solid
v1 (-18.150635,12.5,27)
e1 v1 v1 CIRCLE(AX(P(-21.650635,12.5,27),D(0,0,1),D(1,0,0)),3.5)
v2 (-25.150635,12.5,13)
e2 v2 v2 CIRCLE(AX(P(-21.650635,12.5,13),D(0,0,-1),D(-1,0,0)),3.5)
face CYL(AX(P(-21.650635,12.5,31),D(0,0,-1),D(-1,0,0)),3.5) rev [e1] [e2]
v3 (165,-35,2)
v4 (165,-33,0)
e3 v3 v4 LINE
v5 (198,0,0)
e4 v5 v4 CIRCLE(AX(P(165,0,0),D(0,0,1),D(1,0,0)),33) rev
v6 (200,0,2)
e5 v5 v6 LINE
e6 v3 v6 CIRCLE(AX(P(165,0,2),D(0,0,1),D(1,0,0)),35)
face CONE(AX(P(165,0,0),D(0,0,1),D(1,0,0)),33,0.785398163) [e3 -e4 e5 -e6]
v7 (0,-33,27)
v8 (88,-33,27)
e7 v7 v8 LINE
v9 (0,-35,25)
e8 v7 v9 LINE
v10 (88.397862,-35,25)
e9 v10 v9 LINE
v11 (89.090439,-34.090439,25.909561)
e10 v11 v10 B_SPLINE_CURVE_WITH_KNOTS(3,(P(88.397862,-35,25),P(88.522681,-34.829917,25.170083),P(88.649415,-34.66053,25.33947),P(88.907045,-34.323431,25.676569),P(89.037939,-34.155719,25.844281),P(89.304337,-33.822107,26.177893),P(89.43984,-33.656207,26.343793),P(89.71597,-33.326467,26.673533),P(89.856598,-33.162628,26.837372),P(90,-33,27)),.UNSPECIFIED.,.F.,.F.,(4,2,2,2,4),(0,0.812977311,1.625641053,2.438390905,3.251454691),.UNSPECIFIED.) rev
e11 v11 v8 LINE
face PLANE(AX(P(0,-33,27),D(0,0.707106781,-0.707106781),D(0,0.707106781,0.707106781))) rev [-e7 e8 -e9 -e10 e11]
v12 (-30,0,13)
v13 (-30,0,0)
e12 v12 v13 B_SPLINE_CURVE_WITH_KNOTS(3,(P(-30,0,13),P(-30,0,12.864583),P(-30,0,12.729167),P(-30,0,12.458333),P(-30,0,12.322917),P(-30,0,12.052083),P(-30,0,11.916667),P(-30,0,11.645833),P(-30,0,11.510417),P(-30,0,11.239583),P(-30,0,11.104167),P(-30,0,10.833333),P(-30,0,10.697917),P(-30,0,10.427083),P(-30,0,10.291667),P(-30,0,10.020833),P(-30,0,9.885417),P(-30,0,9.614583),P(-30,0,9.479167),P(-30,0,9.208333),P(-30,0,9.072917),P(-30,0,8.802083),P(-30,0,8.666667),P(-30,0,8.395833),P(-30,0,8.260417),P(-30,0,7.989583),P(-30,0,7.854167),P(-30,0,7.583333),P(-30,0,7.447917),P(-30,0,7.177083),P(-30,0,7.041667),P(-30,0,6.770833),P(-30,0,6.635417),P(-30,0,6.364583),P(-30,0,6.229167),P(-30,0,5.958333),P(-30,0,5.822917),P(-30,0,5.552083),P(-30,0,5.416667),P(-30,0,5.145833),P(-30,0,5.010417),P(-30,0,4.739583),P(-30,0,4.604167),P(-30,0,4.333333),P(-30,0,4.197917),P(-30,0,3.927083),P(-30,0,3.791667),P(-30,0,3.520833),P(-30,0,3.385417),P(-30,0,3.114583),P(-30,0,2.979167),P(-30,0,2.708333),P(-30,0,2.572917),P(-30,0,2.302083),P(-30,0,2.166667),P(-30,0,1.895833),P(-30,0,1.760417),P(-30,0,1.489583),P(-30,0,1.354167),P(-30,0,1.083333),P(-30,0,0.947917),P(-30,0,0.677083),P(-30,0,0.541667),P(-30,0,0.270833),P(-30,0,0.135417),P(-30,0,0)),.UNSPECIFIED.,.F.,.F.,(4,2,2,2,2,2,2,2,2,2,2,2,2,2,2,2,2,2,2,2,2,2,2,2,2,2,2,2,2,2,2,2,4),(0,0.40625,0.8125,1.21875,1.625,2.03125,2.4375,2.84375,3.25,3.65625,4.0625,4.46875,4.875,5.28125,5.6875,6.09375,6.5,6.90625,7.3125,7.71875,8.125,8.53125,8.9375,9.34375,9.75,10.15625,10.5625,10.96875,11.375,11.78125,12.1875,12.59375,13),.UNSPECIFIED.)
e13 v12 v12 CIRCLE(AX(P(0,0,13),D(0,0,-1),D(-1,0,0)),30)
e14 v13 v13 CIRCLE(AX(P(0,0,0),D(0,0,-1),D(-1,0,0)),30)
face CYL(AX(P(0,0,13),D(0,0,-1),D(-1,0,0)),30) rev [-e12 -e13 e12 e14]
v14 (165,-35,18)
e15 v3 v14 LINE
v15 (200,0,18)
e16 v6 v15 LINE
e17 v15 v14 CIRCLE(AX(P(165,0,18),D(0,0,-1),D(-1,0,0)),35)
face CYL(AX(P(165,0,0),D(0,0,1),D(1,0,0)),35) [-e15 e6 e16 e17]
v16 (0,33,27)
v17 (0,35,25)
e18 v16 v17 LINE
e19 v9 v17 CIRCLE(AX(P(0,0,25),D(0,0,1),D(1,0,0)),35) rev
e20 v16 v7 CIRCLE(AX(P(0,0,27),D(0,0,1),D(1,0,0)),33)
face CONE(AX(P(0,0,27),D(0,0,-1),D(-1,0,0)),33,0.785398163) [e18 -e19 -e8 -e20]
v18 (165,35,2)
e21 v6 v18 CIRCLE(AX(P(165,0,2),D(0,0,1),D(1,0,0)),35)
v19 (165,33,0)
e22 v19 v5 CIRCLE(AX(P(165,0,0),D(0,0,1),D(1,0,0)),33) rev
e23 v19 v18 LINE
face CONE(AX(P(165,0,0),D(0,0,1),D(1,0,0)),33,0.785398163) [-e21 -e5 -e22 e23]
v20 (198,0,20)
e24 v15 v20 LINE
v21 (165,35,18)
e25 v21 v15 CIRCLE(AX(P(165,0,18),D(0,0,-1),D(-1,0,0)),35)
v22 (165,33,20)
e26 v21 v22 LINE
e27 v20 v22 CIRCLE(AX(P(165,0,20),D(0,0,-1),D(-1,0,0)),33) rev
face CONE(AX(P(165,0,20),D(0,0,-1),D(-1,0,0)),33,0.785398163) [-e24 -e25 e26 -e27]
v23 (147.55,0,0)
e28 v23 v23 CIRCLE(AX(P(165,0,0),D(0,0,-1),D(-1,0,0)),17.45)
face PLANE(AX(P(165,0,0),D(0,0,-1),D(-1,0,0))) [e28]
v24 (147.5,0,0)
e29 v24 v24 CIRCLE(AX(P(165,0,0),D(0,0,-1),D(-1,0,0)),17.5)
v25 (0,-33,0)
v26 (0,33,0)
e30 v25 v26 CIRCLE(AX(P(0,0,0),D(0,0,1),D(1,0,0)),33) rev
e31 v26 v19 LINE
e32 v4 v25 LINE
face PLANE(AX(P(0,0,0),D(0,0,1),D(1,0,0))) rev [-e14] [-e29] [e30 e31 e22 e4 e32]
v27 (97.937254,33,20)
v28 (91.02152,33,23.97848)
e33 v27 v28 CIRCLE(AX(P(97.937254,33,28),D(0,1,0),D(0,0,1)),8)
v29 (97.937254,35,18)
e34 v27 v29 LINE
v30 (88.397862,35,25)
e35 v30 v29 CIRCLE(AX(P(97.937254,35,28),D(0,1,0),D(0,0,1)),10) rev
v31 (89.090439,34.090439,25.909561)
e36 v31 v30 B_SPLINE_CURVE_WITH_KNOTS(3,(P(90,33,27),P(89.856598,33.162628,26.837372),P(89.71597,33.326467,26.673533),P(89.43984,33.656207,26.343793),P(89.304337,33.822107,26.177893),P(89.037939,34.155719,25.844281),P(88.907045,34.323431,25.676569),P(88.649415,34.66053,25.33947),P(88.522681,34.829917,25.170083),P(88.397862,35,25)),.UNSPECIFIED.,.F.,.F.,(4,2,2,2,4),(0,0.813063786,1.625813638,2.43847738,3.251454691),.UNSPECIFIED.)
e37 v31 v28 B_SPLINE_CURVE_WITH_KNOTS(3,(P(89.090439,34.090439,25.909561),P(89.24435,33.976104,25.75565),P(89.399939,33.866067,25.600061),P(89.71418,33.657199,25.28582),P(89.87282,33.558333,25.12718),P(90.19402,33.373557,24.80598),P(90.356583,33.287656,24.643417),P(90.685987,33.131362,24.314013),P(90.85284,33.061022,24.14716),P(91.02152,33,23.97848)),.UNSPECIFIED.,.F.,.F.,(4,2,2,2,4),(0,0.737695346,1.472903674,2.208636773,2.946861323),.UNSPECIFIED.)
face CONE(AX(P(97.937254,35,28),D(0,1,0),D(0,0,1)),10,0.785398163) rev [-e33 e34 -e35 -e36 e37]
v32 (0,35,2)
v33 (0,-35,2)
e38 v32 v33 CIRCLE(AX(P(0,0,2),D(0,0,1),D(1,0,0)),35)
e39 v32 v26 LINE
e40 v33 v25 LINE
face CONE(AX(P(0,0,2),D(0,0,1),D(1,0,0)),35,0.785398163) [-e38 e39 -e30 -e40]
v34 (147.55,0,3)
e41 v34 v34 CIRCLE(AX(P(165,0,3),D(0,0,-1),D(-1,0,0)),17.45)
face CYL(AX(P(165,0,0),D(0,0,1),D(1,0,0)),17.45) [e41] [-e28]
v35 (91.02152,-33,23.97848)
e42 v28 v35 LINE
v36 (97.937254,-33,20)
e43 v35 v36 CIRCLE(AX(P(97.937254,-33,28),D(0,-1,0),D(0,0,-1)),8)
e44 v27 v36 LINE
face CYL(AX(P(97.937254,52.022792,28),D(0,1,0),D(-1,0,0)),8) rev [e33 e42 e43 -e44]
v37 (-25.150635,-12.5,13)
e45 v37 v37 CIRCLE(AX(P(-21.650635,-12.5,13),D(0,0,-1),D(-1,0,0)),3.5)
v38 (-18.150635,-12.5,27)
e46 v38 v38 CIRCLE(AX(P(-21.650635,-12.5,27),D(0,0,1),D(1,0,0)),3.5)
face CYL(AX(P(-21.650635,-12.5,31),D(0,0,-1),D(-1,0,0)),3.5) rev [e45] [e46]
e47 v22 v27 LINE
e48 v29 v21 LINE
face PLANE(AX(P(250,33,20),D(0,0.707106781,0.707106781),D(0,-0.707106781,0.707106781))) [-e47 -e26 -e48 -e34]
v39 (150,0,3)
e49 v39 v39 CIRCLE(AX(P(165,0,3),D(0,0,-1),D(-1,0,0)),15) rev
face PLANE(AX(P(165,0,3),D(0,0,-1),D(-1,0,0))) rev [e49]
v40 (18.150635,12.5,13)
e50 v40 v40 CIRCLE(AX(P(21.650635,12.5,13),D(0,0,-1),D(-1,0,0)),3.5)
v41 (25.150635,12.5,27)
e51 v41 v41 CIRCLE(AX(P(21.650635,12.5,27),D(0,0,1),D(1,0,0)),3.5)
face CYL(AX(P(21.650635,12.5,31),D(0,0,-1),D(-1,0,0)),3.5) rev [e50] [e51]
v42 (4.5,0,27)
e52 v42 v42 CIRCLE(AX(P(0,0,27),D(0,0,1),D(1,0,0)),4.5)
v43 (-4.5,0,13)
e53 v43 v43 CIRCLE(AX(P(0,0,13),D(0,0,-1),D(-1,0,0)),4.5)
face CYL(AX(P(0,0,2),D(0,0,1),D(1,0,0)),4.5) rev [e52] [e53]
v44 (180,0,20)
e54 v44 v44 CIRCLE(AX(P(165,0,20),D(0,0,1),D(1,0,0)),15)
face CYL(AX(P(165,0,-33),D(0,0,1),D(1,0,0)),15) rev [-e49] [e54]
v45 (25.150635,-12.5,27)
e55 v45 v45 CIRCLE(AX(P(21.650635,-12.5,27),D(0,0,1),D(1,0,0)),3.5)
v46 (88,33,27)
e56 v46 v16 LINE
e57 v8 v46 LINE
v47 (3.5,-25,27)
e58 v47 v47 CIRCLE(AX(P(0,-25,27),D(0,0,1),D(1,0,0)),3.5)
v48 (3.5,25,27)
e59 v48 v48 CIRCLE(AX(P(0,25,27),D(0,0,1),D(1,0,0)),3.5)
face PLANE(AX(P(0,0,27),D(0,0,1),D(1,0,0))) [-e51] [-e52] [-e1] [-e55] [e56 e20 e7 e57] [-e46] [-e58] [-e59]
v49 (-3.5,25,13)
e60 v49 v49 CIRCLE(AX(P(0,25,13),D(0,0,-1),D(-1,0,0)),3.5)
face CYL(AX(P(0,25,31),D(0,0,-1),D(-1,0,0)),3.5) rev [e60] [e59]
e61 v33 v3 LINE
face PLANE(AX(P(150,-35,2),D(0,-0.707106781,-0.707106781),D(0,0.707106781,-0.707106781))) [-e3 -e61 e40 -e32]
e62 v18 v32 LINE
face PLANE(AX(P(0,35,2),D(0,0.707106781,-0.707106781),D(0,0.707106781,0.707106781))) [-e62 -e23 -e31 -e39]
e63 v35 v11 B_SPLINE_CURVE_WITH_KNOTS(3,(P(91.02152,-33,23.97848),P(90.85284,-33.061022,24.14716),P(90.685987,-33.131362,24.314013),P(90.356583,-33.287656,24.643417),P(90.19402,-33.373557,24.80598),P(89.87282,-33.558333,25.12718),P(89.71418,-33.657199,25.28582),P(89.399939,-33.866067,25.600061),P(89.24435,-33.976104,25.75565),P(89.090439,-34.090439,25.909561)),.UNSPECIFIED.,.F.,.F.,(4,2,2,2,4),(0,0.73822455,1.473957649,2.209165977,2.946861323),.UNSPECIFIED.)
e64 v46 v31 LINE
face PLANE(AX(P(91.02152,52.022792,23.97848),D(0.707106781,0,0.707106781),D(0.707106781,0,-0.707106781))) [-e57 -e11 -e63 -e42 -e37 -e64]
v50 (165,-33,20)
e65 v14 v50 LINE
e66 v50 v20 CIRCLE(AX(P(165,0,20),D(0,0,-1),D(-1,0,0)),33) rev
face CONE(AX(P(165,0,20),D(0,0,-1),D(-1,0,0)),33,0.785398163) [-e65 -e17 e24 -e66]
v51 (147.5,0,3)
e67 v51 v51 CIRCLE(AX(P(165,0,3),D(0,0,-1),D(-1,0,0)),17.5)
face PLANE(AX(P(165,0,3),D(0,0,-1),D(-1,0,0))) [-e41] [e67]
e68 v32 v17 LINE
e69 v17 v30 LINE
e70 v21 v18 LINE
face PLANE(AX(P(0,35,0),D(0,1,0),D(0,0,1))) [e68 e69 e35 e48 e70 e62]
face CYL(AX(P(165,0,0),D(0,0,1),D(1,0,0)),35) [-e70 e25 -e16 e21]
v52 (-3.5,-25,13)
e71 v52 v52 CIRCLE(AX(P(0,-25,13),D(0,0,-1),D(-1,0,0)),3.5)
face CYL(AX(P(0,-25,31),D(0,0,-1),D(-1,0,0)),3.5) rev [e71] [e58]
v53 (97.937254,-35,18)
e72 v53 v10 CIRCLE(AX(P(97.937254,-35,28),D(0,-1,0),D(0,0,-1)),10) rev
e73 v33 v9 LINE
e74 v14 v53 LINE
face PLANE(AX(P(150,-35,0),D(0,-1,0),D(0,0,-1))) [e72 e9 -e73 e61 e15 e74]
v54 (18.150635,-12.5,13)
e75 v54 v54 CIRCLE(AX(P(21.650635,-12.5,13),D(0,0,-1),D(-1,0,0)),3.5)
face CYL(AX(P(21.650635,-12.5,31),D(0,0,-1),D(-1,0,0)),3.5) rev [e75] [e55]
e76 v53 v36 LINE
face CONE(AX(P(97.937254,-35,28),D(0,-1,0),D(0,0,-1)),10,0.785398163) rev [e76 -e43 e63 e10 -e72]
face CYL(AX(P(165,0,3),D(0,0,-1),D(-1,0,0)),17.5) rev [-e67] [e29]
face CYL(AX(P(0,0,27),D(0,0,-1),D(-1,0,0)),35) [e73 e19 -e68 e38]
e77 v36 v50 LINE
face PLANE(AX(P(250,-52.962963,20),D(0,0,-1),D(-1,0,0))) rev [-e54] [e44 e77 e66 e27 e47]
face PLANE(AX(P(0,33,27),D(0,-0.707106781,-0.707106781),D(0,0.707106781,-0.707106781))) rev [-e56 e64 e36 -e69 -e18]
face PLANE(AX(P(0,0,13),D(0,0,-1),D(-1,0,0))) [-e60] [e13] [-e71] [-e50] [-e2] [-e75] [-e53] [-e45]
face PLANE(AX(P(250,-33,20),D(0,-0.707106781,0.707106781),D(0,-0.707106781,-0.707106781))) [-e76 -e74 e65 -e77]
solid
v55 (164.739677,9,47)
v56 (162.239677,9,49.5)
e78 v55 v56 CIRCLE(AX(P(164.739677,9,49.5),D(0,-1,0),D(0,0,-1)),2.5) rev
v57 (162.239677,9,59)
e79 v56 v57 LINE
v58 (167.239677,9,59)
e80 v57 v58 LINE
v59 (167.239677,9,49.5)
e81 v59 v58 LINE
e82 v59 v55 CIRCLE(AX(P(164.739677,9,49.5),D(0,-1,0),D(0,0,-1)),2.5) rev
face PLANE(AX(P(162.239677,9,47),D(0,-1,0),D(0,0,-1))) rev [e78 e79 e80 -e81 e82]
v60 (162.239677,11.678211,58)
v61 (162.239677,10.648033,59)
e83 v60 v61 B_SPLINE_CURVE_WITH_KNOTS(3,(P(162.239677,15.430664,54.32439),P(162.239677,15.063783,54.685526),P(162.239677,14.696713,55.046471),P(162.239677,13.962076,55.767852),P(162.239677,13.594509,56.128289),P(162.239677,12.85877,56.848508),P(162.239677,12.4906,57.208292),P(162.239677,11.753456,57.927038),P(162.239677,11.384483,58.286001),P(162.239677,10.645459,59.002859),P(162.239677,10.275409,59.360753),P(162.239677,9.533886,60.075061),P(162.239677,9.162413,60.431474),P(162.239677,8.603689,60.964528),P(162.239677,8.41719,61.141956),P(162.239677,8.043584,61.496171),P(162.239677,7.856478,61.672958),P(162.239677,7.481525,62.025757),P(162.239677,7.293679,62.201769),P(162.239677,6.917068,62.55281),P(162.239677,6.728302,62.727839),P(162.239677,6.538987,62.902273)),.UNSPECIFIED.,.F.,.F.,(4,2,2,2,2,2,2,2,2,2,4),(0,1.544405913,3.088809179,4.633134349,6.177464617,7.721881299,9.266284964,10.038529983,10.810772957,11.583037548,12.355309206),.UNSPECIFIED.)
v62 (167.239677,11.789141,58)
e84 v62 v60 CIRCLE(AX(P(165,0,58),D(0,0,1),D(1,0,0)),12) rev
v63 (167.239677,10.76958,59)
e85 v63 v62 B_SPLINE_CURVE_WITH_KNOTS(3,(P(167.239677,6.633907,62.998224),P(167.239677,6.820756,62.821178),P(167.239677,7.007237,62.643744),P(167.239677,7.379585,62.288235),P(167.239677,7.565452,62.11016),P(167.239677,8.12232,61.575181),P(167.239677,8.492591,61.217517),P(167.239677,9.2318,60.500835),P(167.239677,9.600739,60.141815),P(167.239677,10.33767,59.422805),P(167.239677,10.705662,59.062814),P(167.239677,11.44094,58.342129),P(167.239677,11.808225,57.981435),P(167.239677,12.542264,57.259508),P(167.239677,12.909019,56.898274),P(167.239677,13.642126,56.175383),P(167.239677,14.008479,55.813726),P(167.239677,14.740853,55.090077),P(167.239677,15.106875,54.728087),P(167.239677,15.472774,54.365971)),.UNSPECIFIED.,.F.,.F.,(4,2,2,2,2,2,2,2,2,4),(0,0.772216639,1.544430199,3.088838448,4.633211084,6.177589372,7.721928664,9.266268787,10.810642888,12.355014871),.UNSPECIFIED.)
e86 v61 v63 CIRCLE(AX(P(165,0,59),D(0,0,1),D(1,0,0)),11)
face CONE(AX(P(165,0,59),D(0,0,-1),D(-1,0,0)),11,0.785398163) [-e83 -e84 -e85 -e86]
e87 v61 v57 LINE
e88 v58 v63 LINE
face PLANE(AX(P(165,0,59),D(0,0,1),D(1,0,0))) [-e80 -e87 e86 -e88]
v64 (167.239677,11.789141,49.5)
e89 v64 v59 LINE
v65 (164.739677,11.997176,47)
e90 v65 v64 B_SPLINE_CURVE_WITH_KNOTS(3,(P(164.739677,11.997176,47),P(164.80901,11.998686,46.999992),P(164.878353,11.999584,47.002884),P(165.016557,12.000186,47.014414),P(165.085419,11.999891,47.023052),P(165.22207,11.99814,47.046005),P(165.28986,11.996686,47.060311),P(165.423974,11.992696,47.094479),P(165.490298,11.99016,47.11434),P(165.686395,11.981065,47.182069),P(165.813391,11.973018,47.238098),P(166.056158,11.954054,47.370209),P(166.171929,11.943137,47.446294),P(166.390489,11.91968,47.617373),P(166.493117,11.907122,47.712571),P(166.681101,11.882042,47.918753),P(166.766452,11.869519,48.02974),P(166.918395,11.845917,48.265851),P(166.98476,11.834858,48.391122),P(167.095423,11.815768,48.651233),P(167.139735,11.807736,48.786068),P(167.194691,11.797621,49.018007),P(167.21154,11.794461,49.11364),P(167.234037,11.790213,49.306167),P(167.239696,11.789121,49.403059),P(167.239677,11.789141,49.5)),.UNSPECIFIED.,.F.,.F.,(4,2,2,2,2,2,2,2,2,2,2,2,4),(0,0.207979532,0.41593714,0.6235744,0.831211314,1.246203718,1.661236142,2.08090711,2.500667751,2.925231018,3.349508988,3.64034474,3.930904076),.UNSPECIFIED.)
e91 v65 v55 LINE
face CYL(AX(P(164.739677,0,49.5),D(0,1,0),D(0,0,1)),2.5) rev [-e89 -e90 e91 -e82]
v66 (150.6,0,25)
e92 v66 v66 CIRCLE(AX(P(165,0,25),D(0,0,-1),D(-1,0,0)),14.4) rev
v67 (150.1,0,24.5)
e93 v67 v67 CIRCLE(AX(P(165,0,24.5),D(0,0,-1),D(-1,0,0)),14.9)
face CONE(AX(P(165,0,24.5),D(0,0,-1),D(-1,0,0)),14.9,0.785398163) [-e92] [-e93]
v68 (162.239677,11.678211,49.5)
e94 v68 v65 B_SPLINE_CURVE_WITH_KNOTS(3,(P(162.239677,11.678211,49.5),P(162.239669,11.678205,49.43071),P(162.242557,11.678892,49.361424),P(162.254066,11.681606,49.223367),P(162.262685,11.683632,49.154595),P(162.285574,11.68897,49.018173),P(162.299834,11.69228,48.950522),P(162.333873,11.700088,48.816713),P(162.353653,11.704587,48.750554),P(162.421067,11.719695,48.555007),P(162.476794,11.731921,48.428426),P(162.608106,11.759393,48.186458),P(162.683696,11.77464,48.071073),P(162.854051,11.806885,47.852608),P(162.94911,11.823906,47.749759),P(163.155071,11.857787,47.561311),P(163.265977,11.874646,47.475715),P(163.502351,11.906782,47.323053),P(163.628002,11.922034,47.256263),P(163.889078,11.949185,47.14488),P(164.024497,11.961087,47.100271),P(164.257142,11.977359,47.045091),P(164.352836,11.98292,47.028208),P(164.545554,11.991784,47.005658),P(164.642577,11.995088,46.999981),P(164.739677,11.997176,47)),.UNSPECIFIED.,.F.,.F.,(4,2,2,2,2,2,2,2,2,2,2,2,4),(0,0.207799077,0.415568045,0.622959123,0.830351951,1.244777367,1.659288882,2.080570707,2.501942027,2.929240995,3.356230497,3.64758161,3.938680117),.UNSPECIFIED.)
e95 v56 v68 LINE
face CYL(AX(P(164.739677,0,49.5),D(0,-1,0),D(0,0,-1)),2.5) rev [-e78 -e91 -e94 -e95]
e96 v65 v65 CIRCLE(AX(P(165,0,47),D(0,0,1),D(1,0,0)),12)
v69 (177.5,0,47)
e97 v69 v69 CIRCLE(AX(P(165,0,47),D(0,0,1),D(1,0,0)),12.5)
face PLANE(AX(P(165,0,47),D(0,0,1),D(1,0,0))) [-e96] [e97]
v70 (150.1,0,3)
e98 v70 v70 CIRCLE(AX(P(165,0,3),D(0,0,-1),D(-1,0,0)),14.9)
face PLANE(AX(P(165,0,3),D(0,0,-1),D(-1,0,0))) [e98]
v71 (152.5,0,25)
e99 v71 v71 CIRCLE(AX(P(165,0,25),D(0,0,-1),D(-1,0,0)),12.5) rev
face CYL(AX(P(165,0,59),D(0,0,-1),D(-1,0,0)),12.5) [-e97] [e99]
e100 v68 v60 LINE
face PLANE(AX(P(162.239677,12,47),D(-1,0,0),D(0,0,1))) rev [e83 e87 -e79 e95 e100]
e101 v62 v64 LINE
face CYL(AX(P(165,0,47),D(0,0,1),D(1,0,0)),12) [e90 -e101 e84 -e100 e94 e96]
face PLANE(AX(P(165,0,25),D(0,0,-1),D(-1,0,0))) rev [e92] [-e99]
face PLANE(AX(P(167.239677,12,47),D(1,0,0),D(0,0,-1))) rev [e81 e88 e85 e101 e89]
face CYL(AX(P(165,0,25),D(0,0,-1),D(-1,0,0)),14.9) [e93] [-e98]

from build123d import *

# Parameters (mm, degrees)
SKETCH_1_R           = 35
EXTRUDE_1_DEPTH      = 27
SKETCH_2_R           = 30
CUT_EXTRUDE_1_DEPTH  = 13
SKETCH_3_R           = 3.5
CUT_EXTRUDE_2_DEPTH  = 18
EXTRUDE_START        = -27
EXTRUDE_3_DEPTH      = 27
SKETCH_6_R           = 4.5
CUT_EXTRUDE_3_DEPTH  = 25
FILLET_2_R           = 35
SKETCH_13_W          = 160
SKETCH_13_H          = 104.985754986
CUT_EXTRUDE_7_DEPTH  = 7
FILLET_4_R           = 8
CHAMFER_1_SIZE       = 2
CHAMFER_2_SIZE       = 2
CHAMFER_3_SIZE       = 2
SKETCH_14_R          = 15
CUT_EXTRUDE_8_DEPTH  = 53
SKETCH_15_R          = 14.9
EXTRUDE_5_DEPTH      = 22
SKETCH_17_R          = 12.5
EXTRUDE_6_DEPTH      = 34
SKETCH_18_R          = 12.5
SKETCH_18_R_2        = 12
CUT_EXTRUDE_9_DEPTH  = 12
CHAMFER_6_SIZE       = 1
CHAMFER_7_SIZE       = 0.5
CUT_EXTRUDE_START    = -3
SKETCH_19_R          = 17.5
SKETCH_19_R_2        = 15
CUT_EXTRUDE_10_DEPTH = 3
SKETCH_20_R          = 17.45
EXTRUDE_7_DEPTH      = 3
SKETCH_21_W          = 5
SKETCH_21_H          = 3
CUT_EXTRUDE_11_DEPTH = 12
FILLET_5_R           = 2.5


# Some blends are built 0.0001 mm under size
with BuildPart() as part:
    # 草图1 → 拉伸1 (new body)
    with BuildSketch(Plane.XY):
        Circle(SKETCH_1_R)
    extrude(amount=EXTRUDE_1_DEPTH)

    # 草图2 → 切除-拉伸1 (cut)
    with BuildSketch(Plane(origin=(0, 0, 0), x_dir=(-1, 0, 0), z_dir=(0, 0, -1))):
        Circle(SKETCH_2_R)
    extrude(amount=-CUT_EXTRUDE_1_DEPTH, mode=Mode.SUBTRACT)

    # 草图3 → 切除-拉伸2 (cut)
    with BuildSketch(Plane(origin=(0, 0, 13), x_dir=(-1, 0, 0), z_dir=(0, 0, -1))):
        with Locations((0, 25)):
            Circle(SKETCH_3_R)
        with Locations((21.650635095, 12.5)):
            Circle(SKETCH_3_R)
        with Locations((21.650635095, -12.5)):
            Circle(SKETCH_3_R)
        with Locations((0, -25)):
            Circle(SKETCH_3_R)
        with Locations((-21.650635095, -12.5)):
            Circle(SKETCH_3_R)
        with Locations((-21.650635095, 12.5)):
            Circle(SKETCH_3_R)
    extrude(amount=-CUT_EXTRUDE_2_DEPTH, mode=Mode.SUBTRACT)

    # 草图5 → 拉伸3 (add)
    with BuildSketch(Plane.XY.offset(27).offset(EXTRUDE_START)):
        with BuildLine():
            Line((0, 35), (150, 35))
            Line((150, 35), (200, 35))
            Line((200, 35), (200, -35))
            Line((200, -35), (150, -35))
            Line((150, -35), (0, -35))
            ThreePointArc((0, -35), (35, 0), (0, 35))
        make_face()
    extrude(amount=EXTRUDE_3_DEPTH)

    # 草图6 → 切除-拉伸3 (cut)
    with BuildSketch(Plane.XY.offset(27)):
        Circle(SKETCH_6_R)
    extrude(amount=-CUT_EXTRUDE_3_DEPTH, mode=Mode.SUBTRACT)

    # 圆角2
    fillet_2_edges = [part.edges().sort_by_distance(p)[0] for p in [
        (200, -35, 13.5),
        (200, 35, 13.5),
    ]]
    fillet(fillet_2_edges, radius=FILLET_2_R - 0.0001)  # a hair under: the kernel refuses the full size

    # 草图13 → 切除-拉伸7 (cut)
    with BuildSketch(Plane.XY.offset(27)):
        with Locations((170, -0.47008547)):
            Rectangle(SKETCH_13_W, SKETCH_13_H)
    extrude(amount=-CUT_EXTRUDE_7_DEPTH, mode=Mode.SUBTRACT)

    # 圆角4
    # the kernel refuses this fillet: 8 mm, written as the material it adds along each edge
    with BuildSketch(Plane(origin=(90, 35, 20), x_dir=(0, 0, 1), z_dir=(0, -1, 0))) as fillet_4_piece_1:
        with BuildLine():
            CenterArc((8, -7.937253933), FILLET_4_R, 97.180755781, 82.819244219)
            Line((0, -7.937253933), (-0.16, -7.937253933))
            Line((-0.16, -7.937253933), (-0.16, 0))
            Line((-0.16, 0), (0, 0.16))
            ThreePointArc((0, 0.16), (3.5, 0.16), (6.98, 0.158745079))
            Line((6.98, 0.158745079), (7, 0))
        make_face()
    extrude(amount=70)

    # 倒角1
    chamfer_1_edges = [part.edges().sort_by_distance(p)[0] for p in [
        (-35, 0, 0),
        (82.50005, -35, 0),
        (82.50005, 35, 0),
        (189.748766631, 24.748766631, 0),
        (189.748766631, -24.748766631, 0),
    ]]
    chamfer(chamfer_1_edges, length=CHAMFER_1_SIZE)

    # 倒角2
    chamfer_2_edges = [part.edges().sort_by_distance(p)[0] for p in [
        (-35, 0, 27),
        (45, -35, 27),
        (189.748766631, -24.748766631, 20),
        (45, 35, 27),
        (189.748766631, 24.748766631, 20),
        (131.468676967, 35, 20),
        (131.468676967, -35, 20),
        (92.645751311, -35, 22),
        (92.645751311, 35, 22),
    ]]
    chamfer(chamfer_2_edges, length=CHAMFER_2_SIZE)

    # 倒角3
    # the kernel refuses this chamfer: 2.306388112, 2 mm, written as the material it takes off along each edge
    with BuildSketch(Plane(origin=(90, 41.181185436, 27), x_dir=(0.3202731013465003, 0, -0.9473252559463905), z_dir=(0, -1, 0))) as chamfer_3_piece_1:
        with BuildLine():
            Line((3.189527355, 0), (-CHAMFER_3_SIZE * 0.320273101347, -CHAMFER_3_SIZE * 0.947325255946))
            Line((-CHAMFER_3_SIZE * 0.320273101347, -CHAMFER_3_SIZE * 0.947325255946), (0, 0))
            ThreePointArc((0, 0), (1.637065861, -0.160453942), (3.189527355, 0))
        make_face()
    extrude(amount=82.362370873, mode=Mode.SUBTRACT)

    # 草图14 → 切除-拉伸8 (cut)
    with BuildSketch(Plane.XY.offset(20)):
        with Locations((165, 0)):
            Circle(SKETCH_14_R)
    extrude(amount=-CUT_EXTRUDE_8_DEPTH, mode=Mode.SUBTRACT)

    # 草图19 → 切除-拉伸10 (cut)
    with BuildSketch(Plane(origin=(0, 0, 0), x_dir=(-1, 0, 0), z_dir=(0, 0, -1)).offset(CUT_EXTRUDE_START)):
        with Locations((-165, 0)):
            Circle(SKETCH_19_R)
        with Locations(Location((-165, 0, 0), (0, 0, 180))):
            Circle(SKETCH_19_R_2, mode=Mode.SUBTRACT)
    extrude(amount=CUT_EXTRUDE_10_DEPTH, mode=Mode.SUBTRACT)

    # 草图20 → 拉伸7 (add)
    with BuildSketch(Plane(origin=(0, 0, 3), x_dir=(-1, 0, 0), z_dir=(0, 0, -1))):
        with Locations((-165, 0)):
            Circle(SKETCH_20_R)
    extrude(amount=EXTRUDE_7_DEPTH)


with BuildPart() as body_2:
    # 草图15 → 拉伸5 (new body)
    with BuildSketch(Plane(origin=(0, 0, 3), x_dir=(-1, 0, 0), z_dir=(0, 0, -1))):
        with Locations((-165, 0)):
            Circle(SKETCH_15_R)
    extrude(amount=-EXTRUDE_5_DEPTH)

    # 草图17 → 拉伸6 (add)
    with BuildSketch(Plane.XY.offset(25)):
        with Locations(Location((165, 0, 0), (0, 0, 180))):
            Circle(SKETCH_17_R)
    extrude(amount=EXTRUDE_6_DEPTH)

    # 草图18 → 切除-拉伸9 (cut)
    with BuildSketch(Plane.XY.offset(59)):
        with Locations(Location((165, 0, 0), (0, 0, 180))):
            Circle(SKETCH_18_R)
        with Locations((165, 0)):
            Circle(SKETCH_18_R_2, mode=Mode.SUBTRACT)
    extrude(amount=-CUT_EXTRUDE_9_DEPTH, mode=Mode.SUBTRACT)

    # 倒角6
    chamfer_6_edges = [body_2.edges().sort_by_distance(p)[0] for p in [
        (153, 0, 59),
    ]]
    chamfer(chamfer_6_edges, length=CHAMFER_6_SIZE)

    # 倒角7
    chamfer_7_edges = [body_2.edges().sort_by_distance(p)[0] for p in [
        (179.9, 0, 25),
    ]]
    chamfer(chamfer_7_edges, length=CHAMFER_7_SIZE)

    # 草图21 → 切除-拉伸11 (cut)
    with BuildSketch(Plane.XY.offset(59)):
        with Locations((164.739676864, 10.5)):
            Rectangle(SKETCH_21_W, SKETCH_21_H)
    extrude(amount=-CUT_EXTRUDE_11_DEPTH, mode=Mode.SUBTRACT)

    # 圆角5
    fillet_5_edges = [body_2.edges().sort_by_distance(p)[0] for p in [
        (167.239676864, 10.394570543, 47),
        (162.239676864, 10.339105586, 47),
    ]]
    fillet(fillet_5_edges, radius=FILLET_5_R - 0.0001)  # a hair under: the kernel refuses the full size


solid = Compound([part.part, body_2.part])
